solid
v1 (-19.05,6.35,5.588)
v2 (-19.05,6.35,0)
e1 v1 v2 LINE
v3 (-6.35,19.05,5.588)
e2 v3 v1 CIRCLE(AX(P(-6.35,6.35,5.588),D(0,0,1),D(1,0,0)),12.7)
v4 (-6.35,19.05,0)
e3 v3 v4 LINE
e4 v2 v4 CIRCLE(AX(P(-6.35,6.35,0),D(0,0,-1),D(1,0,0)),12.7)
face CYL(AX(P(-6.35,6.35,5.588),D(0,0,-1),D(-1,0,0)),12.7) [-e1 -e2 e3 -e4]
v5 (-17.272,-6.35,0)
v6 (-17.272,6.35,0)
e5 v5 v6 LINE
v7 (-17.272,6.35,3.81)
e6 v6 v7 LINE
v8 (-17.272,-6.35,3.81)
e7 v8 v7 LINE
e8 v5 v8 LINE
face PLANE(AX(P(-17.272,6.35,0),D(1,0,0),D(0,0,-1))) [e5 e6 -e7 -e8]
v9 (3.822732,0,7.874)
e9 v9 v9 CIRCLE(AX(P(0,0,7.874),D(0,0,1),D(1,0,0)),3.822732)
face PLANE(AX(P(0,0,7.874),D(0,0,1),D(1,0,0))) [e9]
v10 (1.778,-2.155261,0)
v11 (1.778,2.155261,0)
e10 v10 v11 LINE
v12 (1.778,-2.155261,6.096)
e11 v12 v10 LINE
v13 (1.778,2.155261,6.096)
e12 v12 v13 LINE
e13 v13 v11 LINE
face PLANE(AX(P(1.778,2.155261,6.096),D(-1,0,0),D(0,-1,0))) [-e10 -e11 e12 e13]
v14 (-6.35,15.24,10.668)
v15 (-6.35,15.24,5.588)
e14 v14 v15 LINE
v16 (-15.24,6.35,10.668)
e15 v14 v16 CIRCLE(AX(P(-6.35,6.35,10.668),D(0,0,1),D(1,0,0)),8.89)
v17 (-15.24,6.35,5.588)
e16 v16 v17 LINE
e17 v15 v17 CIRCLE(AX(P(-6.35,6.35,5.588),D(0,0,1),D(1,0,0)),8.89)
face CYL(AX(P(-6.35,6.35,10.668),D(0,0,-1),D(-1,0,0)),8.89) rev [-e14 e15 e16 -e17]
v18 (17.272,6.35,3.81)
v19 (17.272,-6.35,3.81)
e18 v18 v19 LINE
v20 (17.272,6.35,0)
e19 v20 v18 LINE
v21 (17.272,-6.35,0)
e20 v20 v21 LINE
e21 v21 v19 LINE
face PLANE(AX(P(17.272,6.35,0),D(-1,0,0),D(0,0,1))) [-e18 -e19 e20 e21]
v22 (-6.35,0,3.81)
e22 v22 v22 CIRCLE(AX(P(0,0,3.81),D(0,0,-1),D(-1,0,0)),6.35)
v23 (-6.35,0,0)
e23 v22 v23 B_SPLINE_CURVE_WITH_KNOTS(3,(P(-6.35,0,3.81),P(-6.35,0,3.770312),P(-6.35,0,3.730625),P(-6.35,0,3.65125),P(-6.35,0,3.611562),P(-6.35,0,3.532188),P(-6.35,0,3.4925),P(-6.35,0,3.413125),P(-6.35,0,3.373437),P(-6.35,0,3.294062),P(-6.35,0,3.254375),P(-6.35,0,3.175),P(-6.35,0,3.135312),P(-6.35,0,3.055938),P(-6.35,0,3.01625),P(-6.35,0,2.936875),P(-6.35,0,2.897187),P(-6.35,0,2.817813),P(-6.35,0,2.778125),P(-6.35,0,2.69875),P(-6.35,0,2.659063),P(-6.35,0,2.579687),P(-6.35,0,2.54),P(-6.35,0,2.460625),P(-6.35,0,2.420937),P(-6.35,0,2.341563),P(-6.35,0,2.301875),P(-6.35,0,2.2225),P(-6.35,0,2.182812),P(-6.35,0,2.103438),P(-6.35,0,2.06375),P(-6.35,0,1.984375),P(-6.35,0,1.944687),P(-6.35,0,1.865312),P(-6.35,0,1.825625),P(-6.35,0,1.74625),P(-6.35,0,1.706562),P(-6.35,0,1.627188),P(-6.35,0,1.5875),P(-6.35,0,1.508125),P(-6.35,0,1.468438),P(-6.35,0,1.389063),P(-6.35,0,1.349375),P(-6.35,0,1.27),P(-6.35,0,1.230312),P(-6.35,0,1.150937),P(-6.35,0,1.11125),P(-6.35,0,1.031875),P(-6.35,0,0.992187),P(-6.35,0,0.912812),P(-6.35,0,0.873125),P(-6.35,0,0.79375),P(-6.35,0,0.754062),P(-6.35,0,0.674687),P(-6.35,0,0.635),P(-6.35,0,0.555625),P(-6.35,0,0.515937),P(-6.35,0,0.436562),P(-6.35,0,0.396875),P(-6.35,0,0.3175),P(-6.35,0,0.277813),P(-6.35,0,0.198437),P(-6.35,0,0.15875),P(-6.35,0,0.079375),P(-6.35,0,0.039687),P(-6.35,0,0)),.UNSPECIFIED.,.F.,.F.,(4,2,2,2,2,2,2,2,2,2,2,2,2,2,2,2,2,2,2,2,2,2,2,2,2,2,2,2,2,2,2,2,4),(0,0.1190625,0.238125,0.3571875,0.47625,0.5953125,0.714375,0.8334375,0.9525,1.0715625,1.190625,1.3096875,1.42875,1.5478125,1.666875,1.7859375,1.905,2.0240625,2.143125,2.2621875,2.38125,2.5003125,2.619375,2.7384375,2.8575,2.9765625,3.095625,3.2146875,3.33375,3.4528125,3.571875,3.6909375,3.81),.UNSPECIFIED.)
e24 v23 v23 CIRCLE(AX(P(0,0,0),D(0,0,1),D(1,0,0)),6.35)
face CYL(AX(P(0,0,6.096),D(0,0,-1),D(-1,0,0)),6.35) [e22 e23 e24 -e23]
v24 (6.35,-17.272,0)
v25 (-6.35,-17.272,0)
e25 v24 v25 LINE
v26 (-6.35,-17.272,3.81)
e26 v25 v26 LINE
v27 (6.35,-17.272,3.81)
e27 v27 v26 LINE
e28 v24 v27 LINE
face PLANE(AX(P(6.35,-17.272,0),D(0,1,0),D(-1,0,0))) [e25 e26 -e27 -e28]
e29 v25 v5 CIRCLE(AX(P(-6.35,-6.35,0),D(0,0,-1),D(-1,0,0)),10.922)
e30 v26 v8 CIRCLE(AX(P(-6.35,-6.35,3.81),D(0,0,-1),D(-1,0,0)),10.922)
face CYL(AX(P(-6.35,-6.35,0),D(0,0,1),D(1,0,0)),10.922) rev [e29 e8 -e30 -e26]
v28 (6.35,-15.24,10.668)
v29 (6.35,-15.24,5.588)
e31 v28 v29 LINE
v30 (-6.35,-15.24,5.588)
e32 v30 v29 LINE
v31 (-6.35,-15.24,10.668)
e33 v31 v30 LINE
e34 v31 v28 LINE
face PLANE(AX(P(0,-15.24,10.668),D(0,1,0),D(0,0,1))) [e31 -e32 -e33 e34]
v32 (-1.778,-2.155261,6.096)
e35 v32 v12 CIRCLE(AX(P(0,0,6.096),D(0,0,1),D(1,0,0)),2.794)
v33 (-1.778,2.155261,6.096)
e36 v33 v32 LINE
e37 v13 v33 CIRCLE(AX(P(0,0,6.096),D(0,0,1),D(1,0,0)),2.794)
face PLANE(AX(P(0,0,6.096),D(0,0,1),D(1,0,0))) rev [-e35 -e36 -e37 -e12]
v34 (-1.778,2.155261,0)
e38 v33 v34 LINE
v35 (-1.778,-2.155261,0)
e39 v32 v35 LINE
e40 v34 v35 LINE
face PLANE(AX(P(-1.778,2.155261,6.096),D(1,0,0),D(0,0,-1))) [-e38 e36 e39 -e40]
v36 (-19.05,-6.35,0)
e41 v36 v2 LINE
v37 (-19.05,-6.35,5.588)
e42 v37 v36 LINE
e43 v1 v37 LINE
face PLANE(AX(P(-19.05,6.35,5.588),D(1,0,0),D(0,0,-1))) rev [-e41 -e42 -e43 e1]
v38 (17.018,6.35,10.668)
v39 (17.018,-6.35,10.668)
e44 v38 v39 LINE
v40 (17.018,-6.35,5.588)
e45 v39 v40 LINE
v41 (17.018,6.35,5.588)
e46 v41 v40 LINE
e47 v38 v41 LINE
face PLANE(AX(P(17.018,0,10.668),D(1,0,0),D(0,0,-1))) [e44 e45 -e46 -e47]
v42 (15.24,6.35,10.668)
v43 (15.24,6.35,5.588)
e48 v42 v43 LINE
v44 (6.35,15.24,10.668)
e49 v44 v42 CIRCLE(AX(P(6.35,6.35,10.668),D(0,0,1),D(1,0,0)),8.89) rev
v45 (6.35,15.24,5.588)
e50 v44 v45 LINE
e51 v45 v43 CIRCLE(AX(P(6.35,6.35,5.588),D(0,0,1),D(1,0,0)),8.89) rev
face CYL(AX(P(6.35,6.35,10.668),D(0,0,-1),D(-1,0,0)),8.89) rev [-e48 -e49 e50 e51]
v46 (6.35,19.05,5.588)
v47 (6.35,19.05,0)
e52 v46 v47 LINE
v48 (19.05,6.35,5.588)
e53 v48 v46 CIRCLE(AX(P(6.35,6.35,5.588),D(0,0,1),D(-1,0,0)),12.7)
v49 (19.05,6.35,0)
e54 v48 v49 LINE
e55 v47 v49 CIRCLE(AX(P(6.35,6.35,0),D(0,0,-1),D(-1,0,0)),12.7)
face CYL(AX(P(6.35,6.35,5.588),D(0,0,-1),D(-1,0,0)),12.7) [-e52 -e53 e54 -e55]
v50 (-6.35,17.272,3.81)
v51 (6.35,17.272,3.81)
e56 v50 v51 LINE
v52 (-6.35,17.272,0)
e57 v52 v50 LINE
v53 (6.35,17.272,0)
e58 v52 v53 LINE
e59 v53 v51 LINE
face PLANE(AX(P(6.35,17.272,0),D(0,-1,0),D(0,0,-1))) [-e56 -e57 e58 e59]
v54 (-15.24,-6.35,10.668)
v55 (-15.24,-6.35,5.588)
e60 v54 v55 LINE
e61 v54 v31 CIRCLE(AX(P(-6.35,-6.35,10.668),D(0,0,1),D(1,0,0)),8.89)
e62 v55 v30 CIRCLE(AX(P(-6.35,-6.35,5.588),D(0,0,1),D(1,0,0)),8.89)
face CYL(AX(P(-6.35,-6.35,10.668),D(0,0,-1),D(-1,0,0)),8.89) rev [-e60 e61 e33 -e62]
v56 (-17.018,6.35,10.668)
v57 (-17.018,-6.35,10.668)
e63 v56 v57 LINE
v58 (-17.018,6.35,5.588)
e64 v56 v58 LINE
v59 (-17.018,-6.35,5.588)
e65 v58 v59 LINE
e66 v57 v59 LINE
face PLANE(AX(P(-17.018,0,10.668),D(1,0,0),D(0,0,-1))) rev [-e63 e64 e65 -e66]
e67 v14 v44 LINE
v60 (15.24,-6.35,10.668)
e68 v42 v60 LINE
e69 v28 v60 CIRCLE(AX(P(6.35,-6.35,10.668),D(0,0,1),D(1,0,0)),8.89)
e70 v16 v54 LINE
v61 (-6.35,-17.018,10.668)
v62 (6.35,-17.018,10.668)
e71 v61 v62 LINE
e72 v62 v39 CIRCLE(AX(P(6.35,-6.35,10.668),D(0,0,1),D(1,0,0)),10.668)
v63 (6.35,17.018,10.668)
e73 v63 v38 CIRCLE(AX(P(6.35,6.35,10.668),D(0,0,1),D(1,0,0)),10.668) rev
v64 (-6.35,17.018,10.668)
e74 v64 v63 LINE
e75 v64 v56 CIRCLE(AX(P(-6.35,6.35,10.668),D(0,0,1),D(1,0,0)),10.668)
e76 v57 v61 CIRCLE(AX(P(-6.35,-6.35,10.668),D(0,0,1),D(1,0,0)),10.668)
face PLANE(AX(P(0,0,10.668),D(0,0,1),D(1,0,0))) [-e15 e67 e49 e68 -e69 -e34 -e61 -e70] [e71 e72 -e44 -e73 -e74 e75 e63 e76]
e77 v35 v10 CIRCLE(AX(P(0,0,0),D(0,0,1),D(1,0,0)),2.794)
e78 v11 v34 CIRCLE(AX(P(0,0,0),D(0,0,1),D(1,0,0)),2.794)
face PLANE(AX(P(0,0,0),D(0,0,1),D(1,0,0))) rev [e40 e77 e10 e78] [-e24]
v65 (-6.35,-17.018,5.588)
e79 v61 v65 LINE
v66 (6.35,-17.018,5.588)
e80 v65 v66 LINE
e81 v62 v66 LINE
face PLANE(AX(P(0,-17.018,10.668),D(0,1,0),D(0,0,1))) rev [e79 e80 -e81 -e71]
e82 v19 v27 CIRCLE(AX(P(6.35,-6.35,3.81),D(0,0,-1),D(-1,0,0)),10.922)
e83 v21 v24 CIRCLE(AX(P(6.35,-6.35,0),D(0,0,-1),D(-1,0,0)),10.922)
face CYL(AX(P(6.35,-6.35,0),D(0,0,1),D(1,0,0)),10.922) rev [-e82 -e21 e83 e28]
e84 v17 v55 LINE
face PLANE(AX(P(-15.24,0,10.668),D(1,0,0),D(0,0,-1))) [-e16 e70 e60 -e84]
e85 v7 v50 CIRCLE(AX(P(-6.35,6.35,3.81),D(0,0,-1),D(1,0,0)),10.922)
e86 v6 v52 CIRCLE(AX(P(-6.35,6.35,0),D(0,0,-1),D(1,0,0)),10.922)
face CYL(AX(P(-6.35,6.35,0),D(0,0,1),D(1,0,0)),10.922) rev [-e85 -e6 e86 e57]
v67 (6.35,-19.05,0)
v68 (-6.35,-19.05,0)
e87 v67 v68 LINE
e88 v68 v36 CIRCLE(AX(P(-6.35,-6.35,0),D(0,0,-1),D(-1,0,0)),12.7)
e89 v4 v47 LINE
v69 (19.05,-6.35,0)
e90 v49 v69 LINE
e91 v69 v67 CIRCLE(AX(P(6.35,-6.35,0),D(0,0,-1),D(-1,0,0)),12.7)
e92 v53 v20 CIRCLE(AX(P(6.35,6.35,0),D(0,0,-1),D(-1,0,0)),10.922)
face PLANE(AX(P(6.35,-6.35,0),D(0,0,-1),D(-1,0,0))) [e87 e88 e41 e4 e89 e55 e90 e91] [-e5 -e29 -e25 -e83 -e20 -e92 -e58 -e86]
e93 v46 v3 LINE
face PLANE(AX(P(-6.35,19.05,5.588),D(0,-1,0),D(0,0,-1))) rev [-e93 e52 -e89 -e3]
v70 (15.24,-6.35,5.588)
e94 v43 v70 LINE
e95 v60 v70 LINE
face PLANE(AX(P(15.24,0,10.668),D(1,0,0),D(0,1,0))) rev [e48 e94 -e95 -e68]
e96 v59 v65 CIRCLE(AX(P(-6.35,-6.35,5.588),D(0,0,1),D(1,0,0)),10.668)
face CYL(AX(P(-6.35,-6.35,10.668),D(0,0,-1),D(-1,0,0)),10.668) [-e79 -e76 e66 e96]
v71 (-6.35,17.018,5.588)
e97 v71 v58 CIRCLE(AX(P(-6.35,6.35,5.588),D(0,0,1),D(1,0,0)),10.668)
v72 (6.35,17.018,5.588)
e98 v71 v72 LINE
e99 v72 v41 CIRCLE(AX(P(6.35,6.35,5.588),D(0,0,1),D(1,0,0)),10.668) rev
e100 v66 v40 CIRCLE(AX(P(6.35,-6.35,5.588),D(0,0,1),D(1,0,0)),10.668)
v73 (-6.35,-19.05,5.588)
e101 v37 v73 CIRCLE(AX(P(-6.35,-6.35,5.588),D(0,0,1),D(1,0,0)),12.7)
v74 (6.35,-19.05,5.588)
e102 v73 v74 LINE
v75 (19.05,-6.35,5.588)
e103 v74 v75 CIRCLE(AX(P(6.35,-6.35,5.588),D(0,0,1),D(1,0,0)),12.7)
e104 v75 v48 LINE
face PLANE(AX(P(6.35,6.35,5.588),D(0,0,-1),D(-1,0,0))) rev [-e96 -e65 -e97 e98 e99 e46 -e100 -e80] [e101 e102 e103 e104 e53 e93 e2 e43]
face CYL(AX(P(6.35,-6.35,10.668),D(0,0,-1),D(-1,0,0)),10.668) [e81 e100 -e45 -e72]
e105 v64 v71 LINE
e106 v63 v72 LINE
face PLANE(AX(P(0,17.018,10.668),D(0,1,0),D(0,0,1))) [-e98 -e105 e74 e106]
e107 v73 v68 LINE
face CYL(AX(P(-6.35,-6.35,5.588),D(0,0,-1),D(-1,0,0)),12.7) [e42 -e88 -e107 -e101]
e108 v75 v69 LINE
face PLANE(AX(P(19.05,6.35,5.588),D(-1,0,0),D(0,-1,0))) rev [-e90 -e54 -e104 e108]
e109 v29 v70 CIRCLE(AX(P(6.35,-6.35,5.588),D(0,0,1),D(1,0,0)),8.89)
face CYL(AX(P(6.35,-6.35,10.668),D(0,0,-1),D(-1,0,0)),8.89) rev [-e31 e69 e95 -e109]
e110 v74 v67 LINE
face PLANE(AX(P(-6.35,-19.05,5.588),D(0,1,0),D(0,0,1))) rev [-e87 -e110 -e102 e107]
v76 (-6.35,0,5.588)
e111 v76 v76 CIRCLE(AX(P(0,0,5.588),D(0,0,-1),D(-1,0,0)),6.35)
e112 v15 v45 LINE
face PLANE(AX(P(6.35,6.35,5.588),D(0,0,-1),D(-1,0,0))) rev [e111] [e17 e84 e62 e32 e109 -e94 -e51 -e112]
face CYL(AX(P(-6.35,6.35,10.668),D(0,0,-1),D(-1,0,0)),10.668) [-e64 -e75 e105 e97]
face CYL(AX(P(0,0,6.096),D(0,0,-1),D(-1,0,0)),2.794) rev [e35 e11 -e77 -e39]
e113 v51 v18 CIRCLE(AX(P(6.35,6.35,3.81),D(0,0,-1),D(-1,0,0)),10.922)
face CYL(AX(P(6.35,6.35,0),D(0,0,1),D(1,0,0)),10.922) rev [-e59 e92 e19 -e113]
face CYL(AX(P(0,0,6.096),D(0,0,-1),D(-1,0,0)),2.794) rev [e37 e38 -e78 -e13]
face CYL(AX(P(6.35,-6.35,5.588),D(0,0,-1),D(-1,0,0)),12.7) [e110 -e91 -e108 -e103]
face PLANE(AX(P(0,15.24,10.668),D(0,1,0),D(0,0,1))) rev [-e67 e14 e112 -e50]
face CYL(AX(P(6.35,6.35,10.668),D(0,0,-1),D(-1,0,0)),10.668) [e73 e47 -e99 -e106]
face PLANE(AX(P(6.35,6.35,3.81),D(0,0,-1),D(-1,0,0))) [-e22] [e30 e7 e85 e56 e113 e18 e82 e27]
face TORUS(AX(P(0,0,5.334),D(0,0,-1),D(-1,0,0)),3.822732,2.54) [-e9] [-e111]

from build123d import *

# Parameters (mm, degrees)
SKETCH1_R           = 6.35
BOSS_EXTRUDE1_DEPTH = 6.096
BOSS_EXTRUDE2_DEPTH = 1.778
CUT_EXTRUDE1_START  = -1.778
CUT_EXTRUDE1_DEPTH  = 1.778
SKETCH5_R           = 6.35
BOSS_EXTRUDE3_DEPTH = 1.778
FILLET2_R           = 2.54
BOSS_EXTRUDE5_START = 3.81
BOSS_EXTRUDE5_DEPTH = 3.81
BOSS_EXTRUDE6_DEPTH = 5.08


with BuildPart() as part:
    # Sketch1 → Boss-Extrude1 (new body)
    with BuildSketch(Plane.XY):
        with Locations(Location((0, 0, 0), (0, 0, 180))):
            Circle(SKETCH1_R)
        with BuildLine():
            Line((-1.778, 2.155261469), (-1.778, -2.155261469))
            ThreePointArc((-1.778, -2.155261469), (0, -2.794), (1.778, -2.155261469))
            Line((1.778, -2.155261469), (1.778, 2.155261469))
            ThreePointArc((1.778, 2.155261469), (0, 2.794), (-1.778, 2.155261469))
        make_face(mode=Mode.SUBTRACT)
    extrude(amount=BOSS_EXTRUDE1_DEPTH)

    # Sketch3 → Boss-Extrude2 (add)
    with BuildSketch(Plane.XY.offset(3.81)):
        with BuildLine():
            Line((-6.35, 19.05), (6.35, 19.05))
            ThreePointArc((6.35, 19.05), (15.330256121, 15.330256121), (19.05, 6.35))
            Line((19.05, 6.35), (19.05, -6.35))
            ThreePointArc((19.05, -6.35), (15.330256121, -15.330256121), (6.35, -19.05))
            Line((6.35, -19.05), (-6.35, -19.05))
            ThreePointArc((-6.35, -19.05), (-15.330256121, -15.330256121), (-19.05, -6.35))
            Line((-19.05, -6.35), (-19.05, 6.35))
            ThreePointArc((-19.05, 6.35), (-15.330256121, 15.330256121), (-6.35, 19.05))
        make_face()
    extrude(amount=BOSS_EXTRUDE2_DEPTH)

    # Sketch4 → Cut-Extrude1 (cut)
    with BuildSketch(Plane.XY.offset(5.588).offset(CUT_EXTRUDE1_START)):
        with BuildLine():
            Line((-1.778, 2.155261469), (-1.778, -2.155261469))
            ThreePointArc((-1.778, -2.155261469), (0, -2.794), (1.778, -2.155261469))
            Line((1.778, -2.155261469), (1.778, 2.155261469))
            ThreePointArc((1.778, 2.155261469), (0, 2.794), (-1.778, 2.155261469))
        make_face()
    extrude(amount=CUT_EXTRUDE1_DEPTH, mode=Mode.SUBTRACT)

    # Sketch5 → Boss-Extrude3 (add)
    with BuildSketch(Plane.XY.offset(6.096)):
        with Locations(Location((0, 0, 0), (0, 0, 180))):
            Circle(SKETCH5_R)
    extrude(amount=BOSS_EXTRUDE3_DEPTH)

    # Fillet2
    # the kernel refuses this fillet: 2.54 mm, written as the material it takes off along each edge
    with BuildSketch(Plane(origin=(0, 0, 7.874), x_dir=(-1, 0, 0), z_dir=(0, 1, 0))) as fillet2_piece_1:
        with BuildLine():
            CenterArc((3.82273191, -2.54), FILLET2_R, 5.739170477, 84.260829523)
            Line((3.82273191, 0), (3.82273191, 0.0508))
            Line((3.82273191, 0.0508), (6.35, 0.0508))
            Line((6.35, 0.0508), (6.4008, 0))
            ThreePointArc((6.4008, 0), (6.4008, -1.143), (6.400545362, -2.28092))
            Line((6.400545362, -2.28092), (6.35, -2.286))
        make_face()
    revolve(axis=Axis((0, 0, 7.874), (0, 0, 1)), mode=Mode.SUBTRACT)

    # Sketch6 → Boss-Extrude5 (add)
    with BuildSketch(Plane(origin=(0, 0, 3.81), x_dir=(-1, 0, 0), z_dir=(0, 0, -1)).offset(BOSS_EXTRUDE5_START)):
        with BuildLine():
            Line((-6.35, 19.05), (6.35, 19.05))
            ThreePointArc((6.35, 19.05), (15.330256121, 15.330256121), (19.05, 6.35))
            Line((19.05, 6.35), (19.05, -6.35))
            ThreePointArc((19.05, -6.35), (15.330256121, -15.330256121), (6.35, -19.05))
            Line((6.35, -19.05), (-6.35, -19.05))
            ThreePointArc((-6.35, -19.05), (-15.330256121, -15.330256121), (-19.05, -6.35))
            Line((-19.05, -6.35), (-19.05, 6.35))
            ThreePointArc((-19.05, 6.35), (-15.330256121, 15.330256121), (-6.35, 19.05))
        make_face()
        with BuildLine():
            Line((-17.272, 6.35), (-17.272, -6.35))
            ThreePointArc((-17.272, -6.35), (-14.073020264, -14.073020264), (-6.35, -17.272))
            Line((-6.35, -17.272), (6.35, -17.272))
            ThreePointArc((6.35, -17.272), (14.073020264, -14.073020264), (17.272, -6.35))
            Line((17.272, -6.35), (17.272, 6.35))
            ThreePointArc((17.272, 6.35), (14.073020264, 14.073020264), (6.35, 17.272))
            Line((6.35, 17.272), (-6.35, 17.272))
            ThreePointArc((-6.35, 17.272), (-14.073020264, 14.073020264), (-17.272, 6.35))
        make_face(mode=Mode.SUBTRACT)
    extrude(amount=-BOSS_EXTRUDE5_DEPTH)

    # Sketch7 → Boss-Extrude6 (add)
    with BuildSketch(Plane.XY.offset(5.588)):
        with BuildLine():
            Line((-6.35, 17.018), (6.35, 17.018))
            ThreePointArc((6.35, 17.018), (13.893415142, 13.893415142), (17.018, 6.35))
            Line((17.018, 6.35), (17.018, -6.35))
            ThreePointArc((17.018, -6.35), (13.893415142, -13.893415142), (6.35, -17.018))
            Line((6.35, -17.018), (-6.35, -17.018))
            ThreePointArc((-6.35, -17.018), (-13.893415142, -13.893415142), (-17.018, -6.35))
            Line((-17.018, -6.35), (-17.018, 6.35))
            ThreePointArc((-17.018, 6.35), (-13.893415142, 13.893415142), (-6.35, 17.018))
        make_face()
        with BuildLine():
            ThreePointArc((-6.35, 15.24), (-12.636179285, 12.636179285), (-15.24, 6.35))
            Line((-15.24, 6.35), (-15.24, -6.35))
            ThreePointArc((-15.24, -6.35), (-12.636179285, -12.636179285), (-6.35, -15.24))
            Line((-6.35, -15.24), (6.35, -15.24))
            ThreePointArc((6.35, -15.24), (12.636179285, -12.636179285), (15.24, -6.35))
            Line((15.24, -6.35), (15.24, 6.35))
            ThreePointArc((15.24, 6.35), (12.636179285, 12.636179285), (6.35, 15.24))
            Line((6.35, 15.24), (-6.35, 15.24))
        make_face(mode=Mode.SUBTRACT)
    extrude(amount=BOSS_EXTRUDE6_DEPTH)


solid = part.part
